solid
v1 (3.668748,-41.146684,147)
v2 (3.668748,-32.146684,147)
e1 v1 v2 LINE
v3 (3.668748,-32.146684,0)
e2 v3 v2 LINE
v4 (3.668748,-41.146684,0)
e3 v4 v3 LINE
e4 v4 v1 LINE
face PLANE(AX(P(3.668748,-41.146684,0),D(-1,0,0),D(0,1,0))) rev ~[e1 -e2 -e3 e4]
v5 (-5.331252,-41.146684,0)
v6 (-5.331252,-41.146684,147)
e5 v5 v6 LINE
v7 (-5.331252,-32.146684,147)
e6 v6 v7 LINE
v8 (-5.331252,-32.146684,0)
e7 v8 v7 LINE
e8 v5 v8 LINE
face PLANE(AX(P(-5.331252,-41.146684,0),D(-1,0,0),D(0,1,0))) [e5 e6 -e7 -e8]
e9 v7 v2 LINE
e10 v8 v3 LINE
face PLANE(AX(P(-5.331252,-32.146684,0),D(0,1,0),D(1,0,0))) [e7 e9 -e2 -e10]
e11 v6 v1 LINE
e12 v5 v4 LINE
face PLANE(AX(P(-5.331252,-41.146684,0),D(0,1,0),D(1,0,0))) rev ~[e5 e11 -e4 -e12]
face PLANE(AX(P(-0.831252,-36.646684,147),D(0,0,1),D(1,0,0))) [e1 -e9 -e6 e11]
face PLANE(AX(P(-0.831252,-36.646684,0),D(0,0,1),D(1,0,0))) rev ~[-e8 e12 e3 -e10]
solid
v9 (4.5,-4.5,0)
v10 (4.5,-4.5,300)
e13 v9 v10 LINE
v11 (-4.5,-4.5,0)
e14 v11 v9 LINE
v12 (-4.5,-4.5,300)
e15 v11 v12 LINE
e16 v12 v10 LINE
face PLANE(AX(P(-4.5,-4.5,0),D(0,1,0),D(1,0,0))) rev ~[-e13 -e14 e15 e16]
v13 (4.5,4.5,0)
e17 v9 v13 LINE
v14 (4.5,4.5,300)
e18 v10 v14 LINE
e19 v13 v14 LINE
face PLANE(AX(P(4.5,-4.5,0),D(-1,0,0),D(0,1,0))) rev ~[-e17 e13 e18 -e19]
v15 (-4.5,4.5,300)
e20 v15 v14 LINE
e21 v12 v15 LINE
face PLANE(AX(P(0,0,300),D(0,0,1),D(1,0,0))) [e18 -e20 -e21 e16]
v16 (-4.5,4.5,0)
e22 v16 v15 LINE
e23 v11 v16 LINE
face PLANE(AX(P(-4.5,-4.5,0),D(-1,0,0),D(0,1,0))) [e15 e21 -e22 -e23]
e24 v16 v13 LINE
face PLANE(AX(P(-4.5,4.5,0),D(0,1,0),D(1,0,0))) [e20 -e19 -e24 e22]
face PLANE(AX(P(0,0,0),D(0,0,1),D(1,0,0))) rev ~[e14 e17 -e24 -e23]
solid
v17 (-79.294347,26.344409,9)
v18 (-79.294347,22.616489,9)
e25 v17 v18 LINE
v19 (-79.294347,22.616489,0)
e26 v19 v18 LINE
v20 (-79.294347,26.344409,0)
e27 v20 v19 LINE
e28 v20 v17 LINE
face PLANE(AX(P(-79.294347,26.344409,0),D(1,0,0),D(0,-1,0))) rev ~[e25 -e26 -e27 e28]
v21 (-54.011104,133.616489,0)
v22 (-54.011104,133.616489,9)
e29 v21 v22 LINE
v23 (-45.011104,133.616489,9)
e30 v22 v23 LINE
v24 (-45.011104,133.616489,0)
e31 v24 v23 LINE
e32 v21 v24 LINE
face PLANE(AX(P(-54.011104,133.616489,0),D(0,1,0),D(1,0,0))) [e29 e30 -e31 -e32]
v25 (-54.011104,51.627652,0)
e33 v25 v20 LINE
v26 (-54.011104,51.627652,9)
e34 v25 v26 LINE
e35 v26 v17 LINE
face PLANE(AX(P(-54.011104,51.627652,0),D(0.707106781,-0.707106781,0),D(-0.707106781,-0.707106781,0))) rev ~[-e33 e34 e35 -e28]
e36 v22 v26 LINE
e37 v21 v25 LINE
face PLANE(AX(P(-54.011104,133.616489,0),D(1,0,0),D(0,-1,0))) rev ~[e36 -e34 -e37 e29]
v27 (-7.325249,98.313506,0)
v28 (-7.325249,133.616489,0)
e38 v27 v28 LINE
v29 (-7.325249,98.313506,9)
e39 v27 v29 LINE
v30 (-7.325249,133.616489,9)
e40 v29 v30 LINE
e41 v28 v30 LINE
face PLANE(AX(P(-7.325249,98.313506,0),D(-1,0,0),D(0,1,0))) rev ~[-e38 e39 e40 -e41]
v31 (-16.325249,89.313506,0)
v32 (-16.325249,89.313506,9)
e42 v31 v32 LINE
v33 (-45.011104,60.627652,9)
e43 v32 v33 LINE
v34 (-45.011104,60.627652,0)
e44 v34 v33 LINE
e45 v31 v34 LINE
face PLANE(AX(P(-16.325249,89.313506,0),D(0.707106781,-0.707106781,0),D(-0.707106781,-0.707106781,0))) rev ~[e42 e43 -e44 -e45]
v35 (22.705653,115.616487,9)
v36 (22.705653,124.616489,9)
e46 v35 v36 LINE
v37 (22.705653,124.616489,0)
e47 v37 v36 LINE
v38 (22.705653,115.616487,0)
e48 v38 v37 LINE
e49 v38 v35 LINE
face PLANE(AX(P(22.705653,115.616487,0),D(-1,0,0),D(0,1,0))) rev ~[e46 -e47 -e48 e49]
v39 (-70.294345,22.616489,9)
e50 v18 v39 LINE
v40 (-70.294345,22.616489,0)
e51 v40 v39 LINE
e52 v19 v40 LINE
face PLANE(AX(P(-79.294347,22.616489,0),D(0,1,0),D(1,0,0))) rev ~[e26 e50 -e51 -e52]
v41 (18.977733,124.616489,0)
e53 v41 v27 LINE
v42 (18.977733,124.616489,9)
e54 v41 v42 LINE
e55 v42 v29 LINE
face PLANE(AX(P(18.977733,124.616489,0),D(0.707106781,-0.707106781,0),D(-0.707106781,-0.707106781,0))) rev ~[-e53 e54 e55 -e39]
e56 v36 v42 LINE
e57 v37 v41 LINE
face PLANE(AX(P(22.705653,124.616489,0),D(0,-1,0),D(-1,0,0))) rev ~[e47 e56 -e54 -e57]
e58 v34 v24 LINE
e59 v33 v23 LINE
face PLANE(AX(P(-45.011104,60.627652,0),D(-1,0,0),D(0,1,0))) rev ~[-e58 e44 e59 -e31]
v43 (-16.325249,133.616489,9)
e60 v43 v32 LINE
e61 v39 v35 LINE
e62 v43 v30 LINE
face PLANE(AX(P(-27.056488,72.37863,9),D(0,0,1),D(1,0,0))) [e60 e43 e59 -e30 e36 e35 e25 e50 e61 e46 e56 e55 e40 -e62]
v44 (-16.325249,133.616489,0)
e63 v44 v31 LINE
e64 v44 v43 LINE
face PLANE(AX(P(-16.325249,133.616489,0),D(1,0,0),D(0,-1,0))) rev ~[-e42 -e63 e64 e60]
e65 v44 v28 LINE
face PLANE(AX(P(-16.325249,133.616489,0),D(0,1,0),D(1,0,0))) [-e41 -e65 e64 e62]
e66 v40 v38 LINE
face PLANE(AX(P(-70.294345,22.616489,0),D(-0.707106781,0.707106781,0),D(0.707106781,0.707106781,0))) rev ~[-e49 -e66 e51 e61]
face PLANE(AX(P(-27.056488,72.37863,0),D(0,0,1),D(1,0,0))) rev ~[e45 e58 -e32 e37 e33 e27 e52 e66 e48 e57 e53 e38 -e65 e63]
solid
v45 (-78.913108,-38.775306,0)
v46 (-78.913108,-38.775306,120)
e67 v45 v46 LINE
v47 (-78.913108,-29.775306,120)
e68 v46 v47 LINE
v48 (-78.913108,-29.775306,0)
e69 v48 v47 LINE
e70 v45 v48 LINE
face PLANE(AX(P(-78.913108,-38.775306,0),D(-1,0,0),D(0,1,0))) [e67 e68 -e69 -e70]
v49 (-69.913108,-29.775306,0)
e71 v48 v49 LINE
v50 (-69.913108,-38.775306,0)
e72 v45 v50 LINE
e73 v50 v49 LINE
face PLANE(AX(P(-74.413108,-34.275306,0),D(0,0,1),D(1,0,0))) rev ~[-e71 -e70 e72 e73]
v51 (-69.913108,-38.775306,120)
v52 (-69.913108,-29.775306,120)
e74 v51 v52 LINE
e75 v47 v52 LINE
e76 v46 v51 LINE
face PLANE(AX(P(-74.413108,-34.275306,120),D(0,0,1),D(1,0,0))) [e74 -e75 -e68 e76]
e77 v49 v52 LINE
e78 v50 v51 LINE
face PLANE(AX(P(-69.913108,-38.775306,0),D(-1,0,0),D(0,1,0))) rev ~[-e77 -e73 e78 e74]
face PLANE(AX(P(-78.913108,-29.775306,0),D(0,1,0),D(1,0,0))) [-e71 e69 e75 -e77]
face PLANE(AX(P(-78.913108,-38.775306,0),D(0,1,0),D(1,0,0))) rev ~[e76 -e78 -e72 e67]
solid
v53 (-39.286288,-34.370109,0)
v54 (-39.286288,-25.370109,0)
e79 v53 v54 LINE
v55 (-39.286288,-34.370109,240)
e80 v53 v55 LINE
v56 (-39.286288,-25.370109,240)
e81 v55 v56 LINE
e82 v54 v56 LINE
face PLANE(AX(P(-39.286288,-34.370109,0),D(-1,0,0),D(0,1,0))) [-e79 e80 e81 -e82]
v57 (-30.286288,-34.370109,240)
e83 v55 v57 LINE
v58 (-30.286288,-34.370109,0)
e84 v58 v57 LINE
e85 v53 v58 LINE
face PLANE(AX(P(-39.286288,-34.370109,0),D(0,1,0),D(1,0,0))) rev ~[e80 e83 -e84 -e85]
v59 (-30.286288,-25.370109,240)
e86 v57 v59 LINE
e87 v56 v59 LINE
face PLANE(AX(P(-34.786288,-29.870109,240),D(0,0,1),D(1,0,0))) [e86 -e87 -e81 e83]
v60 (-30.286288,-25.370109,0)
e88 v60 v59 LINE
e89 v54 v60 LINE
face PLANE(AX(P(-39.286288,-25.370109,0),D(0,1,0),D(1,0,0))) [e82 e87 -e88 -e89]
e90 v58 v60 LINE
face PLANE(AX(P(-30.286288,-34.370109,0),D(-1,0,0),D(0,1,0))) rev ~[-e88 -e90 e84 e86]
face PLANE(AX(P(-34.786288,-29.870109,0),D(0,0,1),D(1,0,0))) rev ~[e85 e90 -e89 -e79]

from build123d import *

# Parameters (mm, degrees)
F0_W     = 9
F0_H     = 9
F1_DEPTH = 300
F2_W     = 9
F2_H     = 9
F3_DEPTH = 120
F4_W     = 9
F4_H     = 9
F5_DEPTH = 240
F6_W     = 9
F6_H     = 5.27208
F7_DEPTH = 9
F8_W     = 9
F8_H     = 9
F9_DEPTH = 147


# Not quite as in the source:
# - a feature names something its author has since deleted; it is built from what else it names


with BuildPart() as f1:
    # F0 (on Top) → F1 (new body)
    with BuildSketch(Plane.XY):
        Rectangle(F0_W, F0_H)
    extrude(amount=F1_DEPTH)


with BuildPart() as f3:
    # F2 (on Top) → F3 (new body)
    with BuildSketch(Plane.XY):
        with Locations((-74.4131075144, -34.275306195)):
            Rectangle(F2_W, F2_H)
    extrude(amount=F3_DEPTH)


with BuildPart() as f5:
    # F4 (on Top) → F5 (new body)
    with BuildSketch(Plane.XY):
        with Locations((-34.7862875015, -29.8701094389)):
            Rectangle(F4_W, F4_H)
    extrude(amount=F5_DEPTH)


with BuildPart() as f7:
    # F6 (on Top) → F7 (new body)
    with BuildSketch(Plane.XY):
        Polygon((-45.0111036971, 60.6276517883), (-54.0111036971, 51.6276517883), (-79.2943466264, 26.3444088591), (-79.2943466264, 22.6164888591), (-70.294344565, 22.6164888591), (22.7056533736, 115.6164867977), (22.7056533736, 124.6164888591), (18.9777333736, 124.6164888591), (-7.3252493367, 98.3135061488), (-16.3252493367, 89.3135061488), align=None)
        Polygon((-45.0111036971, 128.3444088591), (-54.0111036971, 128.3444088591), (-54.0111036971, 51.6276517883), (-45.0111036971, 60.6276517883), align=None)
        with Locations((-49.5111036971, 130.9804488591)):
            Rectangle(F6_W, F6_H)
        Polygon((-7.3252493367, 128.3444088591), (-16.3252493367, 128.3444088591), (-16.3252493367, 89.3135061488), (-7.3252493367, 98.3135061488), align=None)
        with Locations((-11.8252493367, 130.9804488591)):
            Rectangle(F6_W, F6_H)
    extrude(amount=F7_DEPTH)


with BuildPart() as f9:
    # F8 (on Top) → F9 (new body)
    with BuildSketch(Plane.XY):
        with Locations((-0.8312522359, -36.646684438)):
            Rectangle(F8_W, F8_H)
    extrude(amount=F9_DEPTH)


solid = Compound([f1.part, f3.part, f5.part, f7.part, f9.part])
